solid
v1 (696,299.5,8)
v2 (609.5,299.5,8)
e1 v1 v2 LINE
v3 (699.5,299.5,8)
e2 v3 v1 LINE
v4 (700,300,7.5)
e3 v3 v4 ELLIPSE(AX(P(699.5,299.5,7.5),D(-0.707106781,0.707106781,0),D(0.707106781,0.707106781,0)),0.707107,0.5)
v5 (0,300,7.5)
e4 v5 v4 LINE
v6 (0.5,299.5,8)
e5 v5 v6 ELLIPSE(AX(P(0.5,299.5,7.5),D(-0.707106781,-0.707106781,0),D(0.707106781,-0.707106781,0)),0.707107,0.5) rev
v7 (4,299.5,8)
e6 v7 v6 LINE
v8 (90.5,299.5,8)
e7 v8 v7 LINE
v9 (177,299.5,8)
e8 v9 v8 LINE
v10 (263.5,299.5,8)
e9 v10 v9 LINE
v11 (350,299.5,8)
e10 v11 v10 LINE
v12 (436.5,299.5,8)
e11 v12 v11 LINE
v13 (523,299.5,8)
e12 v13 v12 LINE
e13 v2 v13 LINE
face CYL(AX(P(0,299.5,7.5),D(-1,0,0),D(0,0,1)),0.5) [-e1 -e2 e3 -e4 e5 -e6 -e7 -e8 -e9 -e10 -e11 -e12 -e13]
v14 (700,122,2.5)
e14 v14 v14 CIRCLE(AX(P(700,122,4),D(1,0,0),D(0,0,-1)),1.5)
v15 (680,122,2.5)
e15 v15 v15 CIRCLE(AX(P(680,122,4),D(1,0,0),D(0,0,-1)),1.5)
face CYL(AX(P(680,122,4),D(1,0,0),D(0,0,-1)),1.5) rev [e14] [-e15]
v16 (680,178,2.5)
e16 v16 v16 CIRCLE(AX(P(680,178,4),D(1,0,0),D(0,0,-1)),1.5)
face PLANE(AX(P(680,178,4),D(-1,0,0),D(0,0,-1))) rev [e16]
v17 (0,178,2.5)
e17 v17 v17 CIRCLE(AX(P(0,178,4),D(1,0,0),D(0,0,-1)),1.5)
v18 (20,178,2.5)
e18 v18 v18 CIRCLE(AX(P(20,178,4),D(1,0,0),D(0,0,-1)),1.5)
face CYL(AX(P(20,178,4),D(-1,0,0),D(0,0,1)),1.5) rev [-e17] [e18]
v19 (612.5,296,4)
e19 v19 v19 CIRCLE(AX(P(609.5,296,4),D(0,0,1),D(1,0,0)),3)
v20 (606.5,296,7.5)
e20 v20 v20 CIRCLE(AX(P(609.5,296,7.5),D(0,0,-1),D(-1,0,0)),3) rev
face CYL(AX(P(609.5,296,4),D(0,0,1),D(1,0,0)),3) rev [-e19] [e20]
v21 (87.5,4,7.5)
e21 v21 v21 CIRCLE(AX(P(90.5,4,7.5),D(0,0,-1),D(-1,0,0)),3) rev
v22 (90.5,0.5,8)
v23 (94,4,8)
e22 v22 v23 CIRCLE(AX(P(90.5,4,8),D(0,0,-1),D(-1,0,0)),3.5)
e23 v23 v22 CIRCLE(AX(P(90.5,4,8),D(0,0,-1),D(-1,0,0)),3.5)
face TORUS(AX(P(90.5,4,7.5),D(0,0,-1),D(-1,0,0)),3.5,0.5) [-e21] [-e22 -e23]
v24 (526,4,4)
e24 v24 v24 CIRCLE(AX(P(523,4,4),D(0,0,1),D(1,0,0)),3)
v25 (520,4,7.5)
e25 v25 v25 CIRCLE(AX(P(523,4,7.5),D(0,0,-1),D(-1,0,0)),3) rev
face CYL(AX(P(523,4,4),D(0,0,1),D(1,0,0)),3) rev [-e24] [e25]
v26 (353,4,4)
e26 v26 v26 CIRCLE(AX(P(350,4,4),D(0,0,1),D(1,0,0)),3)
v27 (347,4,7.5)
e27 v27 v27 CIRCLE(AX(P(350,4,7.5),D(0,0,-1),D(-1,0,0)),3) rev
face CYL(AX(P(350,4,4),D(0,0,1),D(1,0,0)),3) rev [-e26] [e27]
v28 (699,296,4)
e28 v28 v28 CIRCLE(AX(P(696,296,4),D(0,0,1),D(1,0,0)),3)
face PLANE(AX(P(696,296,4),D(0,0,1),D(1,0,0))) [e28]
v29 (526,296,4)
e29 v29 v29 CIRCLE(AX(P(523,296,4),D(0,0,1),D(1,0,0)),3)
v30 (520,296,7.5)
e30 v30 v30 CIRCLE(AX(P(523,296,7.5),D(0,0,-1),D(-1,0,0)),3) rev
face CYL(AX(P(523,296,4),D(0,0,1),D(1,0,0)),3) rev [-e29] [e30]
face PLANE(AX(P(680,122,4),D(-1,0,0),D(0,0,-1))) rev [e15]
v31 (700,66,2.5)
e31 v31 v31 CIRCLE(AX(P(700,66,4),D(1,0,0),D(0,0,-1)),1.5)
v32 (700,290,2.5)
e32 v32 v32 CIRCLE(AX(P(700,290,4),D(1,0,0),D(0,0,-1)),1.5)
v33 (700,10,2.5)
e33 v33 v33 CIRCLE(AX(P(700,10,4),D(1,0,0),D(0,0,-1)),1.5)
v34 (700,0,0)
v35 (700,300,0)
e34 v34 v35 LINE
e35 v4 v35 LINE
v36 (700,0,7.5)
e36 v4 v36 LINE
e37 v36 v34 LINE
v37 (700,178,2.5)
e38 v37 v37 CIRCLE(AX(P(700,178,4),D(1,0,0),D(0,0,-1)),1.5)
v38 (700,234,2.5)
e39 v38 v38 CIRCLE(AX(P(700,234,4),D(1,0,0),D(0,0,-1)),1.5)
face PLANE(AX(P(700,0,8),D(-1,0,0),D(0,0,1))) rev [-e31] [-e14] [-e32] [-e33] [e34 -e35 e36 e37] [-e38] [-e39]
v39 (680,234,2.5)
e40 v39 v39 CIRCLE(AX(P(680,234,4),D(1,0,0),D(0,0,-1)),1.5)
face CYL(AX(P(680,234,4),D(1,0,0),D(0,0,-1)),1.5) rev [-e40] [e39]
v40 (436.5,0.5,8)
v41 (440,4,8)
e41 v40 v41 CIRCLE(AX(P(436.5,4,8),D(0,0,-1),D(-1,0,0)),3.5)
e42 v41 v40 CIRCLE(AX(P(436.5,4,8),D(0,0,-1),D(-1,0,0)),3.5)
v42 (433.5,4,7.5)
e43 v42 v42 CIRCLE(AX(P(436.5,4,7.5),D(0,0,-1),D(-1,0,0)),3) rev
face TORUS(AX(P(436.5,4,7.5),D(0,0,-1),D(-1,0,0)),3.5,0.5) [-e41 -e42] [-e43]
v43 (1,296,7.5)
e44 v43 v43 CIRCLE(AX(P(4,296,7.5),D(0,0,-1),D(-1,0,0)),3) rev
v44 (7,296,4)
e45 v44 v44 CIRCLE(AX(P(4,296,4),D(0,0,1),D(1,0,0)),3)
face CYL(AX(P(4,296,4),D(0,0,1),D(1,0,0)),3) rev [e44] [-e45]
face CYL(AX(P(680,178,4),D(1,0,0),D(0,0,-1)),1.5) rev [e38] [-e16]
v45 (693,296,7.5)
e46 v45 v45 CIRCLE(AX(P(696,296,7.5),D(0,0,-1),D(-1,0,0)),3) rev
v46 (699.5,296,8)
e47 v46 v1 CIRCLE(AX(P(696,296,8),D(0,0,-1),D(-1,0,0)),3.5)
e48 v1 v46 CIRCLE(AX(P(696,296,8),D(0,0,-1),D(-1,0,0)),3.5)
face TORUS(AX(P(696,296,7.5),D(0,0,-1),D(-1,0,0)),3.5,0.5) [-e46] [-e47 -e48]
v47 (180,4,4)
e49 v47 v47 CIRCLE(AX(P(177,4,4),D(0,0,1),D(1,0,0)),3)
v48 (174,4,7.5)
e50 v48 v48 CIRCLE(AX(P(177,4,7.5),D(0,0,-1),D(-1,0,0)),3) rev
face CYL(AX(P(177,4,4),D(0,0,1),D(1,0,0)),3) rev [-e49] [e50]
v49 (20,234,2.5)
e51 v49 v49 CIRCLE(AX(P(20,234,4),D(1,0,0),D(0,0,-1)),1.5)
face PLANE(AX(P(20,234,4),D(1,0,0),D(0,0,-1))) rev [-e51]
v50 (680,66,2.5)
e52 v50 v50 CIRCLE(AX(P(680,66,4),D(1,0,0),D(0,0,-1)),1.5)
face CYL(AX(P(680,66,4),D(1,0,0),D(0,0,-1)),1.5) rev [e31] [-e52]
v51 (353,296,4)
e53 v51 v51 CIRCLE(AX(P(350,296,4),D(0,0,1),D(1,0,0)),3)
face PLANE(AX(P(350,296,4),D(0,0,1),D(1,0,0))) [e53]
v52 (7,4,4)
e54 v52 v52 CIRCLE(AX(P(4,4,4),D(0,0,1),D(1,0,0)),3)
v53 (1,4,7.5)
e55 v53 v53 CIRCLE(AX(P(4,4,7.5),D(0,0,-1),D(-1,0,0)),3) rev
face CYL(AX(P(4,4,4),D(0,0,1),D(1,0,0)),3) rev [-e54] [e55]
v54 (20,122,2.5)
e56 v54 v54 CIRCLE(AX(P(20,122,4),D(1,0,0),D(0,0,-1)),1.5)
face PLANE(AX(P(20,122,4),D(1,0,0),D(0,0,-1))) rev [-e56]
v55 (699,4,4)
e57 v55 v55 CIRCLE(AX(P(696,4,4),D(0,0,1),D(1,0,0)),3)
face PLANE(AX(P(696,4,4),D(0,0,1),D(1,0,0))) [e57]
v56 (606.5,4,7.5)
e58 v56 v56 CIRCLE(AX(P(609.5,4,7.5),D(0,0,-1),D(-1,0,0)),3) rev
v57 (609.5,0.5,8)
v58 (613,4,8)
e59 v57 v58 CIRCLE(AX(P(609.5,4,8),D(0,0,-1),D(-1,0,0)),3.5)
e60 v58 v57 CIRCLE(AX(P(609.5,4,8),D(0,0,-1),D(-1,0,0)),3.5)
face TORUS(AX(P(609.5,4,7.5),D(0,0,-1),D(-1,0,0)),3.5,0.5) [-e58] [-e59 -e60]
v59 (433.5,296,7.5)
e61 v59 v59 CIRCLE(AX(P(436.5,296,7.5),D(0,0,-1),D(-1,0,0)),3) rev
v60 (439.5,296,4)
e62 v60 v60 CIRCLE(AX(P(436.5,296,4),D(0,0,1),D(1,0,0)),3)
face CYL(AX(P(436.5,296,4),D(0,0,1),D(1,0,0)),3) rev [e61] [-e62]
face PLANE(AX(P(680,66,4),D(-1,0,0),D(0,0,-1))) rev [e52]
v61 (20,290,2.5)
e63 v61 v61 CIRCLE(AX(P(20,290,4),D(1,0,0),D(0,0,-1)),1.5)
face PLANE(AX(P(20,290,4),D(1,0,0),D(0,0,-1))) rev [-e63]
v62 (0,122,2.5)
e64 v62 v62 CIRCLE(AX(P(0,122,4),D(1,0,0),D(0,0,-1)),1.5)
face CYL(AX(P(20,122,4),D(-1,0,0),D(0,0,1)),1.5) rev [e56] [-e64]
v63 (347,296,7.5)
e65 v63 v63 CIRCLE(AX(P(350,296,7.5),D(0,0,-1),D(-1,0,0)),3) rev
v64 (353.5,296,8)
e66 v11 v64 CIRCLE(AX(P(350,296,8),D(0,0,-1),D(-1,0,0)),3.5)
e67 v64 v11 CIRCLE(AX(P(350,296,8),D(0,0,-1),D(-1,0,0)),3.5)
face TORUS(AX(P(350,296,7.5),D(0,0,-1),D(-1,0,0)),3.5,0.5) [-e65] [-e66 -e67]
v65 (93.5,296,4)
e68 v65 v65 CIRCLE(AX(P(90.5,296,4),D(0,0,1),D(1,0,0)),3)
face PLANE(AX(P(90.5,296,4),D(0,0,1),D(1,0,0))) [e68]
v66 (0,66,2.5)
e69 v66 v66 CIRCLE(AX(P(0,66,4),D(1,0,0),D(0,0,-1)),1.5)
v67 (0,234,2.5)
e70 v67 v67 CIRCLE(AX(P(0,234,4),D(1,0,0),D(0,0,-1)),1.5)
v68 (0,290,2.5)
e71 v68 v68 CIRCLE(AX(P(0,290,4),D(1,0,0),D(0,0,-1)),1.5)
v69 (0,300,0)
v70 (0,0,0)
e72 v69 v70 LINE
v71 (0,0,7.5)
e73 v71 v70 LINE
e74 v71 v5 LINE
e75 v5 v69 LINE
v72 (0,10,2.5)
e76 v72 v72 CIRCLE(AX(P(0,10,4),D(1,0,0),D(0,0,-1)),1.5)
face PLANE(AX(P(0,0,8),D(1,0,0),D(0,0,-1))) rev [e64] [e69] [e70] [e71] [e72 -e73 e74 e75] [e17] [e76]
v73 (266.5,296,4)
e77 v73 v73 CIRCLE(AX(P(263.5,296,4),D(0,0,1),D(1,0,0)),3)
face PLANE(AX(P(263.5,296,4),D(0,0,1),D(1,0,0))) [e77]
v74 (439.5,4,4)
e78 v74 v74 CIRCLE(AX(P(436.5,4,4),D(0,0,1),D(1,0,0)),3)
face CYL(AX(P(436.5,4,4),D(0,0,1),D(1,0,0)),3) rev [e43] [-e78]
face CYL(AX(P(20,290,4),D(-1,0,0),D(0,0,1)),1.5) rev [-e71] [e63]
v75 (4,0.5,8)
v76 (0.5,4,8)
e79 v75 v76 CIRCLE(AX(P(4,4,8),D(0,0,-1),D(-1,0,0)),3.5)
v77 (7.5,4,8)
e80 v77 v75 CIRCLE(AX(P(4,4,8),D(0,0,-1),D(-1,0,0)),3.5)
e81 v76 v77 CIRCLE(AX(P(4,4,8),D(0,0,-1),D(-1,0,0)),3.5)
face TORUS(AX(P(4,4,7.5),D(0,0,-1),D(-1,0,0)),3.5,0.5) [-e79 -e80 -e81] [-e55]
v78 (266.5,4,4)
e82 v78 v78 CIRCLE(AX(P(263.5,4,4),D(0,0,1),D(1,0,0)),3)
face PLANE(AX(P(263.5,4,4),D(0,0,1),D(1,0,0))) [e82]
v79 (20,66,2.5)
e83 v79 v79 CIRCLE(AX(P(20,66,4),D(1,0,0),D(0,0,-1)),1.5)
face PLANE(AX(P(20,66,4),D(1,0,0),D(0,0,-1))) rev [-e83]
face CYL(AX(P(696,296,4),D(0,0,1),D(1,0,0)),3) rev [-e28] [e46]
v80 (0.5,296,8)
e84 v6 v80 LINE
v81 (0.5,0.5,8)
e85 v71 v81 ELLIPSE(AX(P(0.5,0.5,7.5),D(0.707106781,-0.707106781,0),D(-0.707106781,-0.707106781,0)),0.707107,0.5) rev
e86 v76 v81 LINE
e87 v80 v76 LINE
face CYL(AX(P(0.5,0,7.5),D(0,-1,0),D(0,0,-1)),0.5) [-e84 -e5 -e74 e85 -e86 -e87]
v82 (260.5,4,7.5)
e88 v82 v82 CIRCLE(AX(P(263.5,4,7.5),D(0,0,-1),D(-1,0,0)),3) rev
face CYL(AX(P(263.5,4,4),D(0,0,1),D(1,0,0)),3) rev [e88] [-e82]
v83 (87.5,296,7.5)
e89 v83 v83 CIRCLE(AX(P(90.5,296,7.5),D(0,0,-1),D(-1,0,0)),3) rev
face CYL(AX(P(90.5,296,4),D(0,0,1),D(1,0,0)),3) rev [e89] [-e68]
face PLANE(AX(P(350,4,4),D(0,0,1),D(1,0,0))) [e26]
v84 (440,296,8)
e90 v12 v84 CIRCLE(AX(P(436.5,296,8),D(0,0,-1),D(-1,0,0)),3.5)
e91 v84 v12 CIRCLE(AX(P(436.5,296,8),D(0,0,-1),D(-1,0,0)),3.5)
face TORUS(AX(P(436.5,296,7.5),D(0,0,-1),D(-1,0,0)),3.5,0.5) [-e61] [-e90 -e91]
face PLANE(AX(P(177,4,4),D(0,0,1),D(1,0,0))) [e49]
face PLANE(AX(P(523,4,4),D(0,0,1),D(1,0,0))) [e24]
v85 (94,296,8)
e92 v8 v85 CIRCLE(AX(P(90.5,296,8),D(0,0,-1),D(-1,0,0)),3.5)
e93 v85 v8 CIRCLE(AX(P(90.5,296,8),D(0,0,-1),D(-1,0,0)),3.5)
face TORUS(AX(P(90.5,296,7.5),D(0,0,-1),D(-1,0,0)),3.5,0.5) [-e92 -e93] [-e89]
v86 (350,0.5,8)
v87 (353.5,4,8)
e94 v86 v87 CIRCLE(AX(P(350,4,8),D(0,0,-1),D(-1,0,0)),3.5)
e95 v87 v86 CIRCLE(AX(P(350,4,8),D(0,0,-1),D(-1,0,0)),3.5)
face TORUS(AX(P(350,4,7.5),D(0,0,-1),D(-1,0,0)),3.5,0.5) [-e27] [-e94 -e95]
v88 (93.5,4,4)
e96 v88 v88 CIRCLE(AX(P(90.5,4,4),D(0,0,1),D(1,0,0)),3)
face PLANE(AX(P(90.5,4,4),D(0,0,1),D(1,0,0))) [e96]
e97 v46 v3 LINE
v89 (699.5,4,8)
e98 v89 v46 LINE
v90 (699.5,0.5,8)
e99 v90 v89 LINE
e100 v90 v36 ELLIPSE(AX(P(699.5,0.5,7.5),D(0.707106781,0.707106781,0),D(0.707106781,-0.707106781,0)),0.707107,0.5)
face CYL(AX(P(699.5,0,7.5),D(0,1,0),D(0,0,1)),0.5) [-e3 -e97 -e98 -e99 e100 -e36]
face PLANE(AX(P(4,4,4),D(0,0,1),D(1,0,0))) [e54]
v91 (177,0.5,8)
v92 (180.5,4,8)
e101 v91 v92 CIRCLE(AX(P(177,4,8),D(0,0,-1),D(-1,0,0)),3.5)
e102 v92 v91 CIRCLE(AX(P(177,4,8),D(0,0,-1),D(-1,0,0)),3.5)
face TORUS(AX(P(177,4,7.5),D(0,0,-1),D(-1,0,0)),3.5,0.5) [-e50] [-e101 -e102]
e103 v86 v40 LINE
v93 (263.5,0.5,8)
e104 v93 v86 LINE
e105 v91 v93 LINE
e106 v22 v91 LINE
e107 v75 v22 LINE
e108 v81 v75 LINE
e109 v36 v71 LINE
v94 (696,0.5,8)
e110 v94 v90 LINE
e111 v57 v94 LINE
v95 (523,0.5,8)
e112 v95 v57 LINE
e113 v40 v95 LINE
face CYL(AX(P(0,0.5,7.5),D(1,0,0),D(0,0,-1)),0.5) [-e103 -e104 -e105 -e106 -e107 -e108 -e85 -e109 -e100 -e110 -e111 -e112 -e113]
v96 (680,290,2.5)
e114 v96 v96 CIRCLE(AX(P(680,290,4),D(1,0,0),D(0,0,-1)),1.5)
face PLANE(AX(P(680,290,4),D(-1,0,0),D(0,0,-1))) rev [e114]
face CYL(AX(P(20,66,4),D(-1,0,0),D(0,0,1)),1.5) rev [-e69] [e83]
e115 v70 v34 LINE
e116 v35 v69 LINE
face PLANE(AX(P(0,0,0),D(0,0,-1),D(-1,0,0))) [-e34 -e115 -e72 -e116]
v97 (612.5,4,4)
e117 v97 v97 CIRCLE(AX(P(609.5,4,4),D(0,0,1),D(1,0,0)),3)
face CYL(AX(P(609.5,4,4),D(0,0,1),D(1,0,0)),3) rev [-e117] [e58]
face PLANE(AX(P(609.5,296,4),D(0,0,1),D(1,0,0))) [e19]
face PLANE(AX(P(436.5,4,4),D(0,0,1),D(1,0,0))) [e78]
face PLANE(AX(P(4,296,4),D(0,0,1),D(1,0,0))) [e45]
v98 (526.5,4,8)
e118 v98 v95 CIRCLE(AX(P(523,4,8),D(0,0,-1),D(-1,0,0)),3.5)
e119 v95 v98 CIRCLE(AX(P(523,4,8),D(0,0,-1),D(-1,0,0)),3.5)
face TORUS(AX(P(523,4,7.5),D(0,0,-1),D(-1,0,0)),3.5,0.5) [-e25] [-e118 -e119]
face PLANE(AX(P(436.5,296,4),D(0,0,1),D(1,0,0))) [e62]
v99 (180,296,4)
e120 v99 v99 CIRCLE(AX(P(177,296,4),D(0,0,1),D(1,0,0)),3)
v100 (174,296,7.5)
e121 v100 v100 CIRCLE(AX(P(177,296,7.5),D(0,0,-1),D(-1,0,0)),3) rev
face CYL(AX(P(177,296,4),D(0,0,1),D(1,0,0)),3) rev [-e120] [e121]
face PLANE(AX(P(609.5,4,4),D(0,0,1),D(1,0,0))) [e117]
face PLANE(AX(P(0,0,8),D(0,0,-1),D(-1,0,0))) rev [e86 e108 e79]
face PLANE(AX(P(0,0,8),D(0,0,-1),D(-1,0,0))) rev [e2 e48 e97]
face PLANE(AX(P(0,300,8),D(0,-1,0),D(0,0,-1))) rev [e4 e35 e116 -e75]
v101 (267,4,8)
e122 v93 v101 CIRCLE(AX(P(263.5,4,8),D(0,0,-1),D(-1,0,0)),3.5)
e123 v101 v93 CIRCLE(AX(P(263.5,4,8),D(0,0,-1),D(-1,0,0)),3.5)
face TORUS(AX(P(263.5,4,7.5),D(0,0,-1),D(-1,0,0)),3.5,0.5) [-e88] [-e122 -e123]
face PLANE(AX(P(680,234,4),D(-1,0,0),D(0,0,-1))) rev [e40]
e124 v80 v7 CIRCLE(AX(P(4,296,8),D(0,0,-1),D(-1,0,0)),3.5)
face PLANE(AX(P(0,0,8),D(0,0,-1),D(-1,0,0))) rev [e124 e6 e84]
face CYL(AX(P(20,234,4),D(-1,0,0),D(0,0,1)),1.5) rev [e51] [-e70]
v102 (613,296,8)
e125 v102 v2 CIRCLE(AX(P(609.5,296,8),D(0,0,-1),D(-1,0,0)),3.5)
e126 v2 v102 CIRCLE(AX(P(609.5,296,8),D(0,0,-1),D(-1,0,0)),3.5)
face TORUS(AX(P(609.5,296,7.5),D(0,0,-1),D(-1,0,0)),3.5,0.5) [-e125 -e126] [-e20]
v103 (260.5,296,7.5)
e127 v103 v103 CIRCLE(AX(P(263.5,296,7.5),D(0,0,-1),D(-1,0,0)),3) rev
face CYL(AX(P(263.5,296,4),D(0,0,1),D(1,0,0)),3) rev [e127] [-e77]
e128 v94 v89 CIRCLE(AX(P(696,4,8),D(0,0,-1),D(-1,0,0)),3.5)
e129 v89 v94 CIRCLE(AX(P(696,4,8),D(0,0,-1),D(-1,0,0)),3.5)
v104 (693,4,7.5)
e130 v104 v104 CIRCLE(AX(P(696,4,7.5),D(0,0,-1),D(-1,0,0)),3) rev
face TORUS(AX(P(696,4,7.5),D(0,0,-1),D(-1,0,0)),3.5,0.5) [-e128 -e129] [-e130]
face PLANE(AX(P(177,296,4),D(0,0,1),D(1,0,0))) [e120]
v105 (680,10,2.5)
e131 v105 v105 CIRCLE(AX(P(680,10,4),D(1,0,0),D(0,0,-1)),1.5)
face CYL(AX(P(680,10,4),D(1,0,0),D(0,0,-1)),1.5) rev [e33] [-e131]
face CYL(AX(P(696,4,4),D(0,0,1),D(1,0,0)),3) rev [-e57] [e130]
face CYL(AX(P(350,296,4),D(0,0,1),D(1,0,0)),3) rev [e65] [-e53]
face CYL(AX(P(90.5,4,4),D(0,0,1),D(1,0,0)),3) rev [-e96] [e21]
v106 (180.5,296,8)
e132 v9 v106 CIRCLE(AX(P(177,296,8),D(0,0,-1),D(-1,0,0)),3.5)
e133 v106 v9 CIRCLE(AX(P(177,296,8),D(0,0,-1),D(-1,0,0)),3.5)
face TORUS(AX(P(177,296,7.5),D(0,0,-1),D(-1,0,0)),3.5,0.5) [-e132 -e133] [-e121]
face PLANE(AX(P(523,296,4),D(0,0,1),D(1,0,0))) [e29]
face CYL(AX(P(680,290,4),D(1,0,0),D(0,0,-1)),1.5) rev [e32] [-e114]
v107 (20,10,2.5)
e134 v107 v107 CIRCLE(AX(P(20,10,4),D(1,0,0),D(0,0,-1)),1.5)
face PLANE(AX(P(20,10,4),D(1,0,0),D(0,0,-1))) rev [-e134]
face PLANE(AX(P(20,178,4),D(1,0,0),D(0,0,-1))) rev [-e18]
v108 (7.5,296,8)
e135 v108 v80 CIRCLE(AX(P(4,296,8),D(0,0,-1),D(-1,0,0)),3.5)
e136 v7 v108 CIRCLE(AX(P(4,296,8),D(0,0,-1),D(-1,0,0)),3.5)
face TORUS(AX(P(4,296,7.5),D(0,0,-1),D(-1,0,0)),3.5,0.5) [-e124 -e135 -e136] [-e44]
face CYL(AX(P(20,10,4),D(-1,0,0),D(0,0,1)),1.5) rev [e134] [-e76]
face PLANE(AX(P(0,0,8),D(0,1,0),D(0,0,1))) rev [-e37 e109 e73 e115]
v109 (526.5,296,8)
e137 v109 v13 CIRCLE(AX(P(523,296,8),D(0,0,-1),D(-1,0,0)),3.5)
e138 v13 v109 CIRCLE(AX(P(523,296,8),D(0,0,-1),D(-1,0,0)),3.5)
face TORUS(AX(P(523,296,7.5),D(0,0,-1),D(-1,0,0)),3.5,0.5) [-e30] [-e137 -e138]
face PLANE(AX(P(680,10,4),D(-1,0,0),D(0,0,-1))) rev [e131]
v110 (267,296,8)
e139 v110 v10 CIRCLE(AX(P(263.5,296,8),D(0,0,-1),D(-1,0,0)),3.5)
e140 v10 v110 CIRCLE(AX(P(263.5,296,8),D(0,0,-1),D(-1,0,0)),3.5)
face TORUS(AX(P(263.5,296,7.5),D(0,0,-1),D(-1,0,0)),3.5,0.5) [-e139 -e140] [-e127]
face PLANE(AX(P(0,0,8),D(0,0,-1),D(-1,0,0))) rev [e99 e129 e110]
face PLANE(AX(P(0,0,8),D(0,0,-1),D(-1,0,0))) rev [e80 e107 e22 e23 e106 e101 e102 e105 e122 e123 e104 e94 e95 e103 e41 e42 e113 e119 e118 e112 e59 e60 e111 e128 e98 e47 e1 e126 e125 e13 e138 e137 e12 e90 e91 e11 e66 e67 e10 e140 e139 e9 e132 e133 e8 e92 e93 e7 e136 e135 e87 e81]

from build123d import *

# Parameters (mm, degrees)
SKETCH1_W               = 700
SKETCH1_H               = 300
BOSS_EXTRUDE1_DEPTH     = 8
SKETCH4_R               = 3
CUT_EXTRUDE2_DEPTH      = 4
LPATTERN1_COUNT         = 9
LPATTERN1_PITCH         = 86.5
LPATTERN1_COUNT_DIR2    = 2
LPATTERN1_PITCH_DIR2    = 292
SKETCH7_R               = 1.5
CUT_EXTRUDE7_DEPTH      = 20
FILLET1_R               = 0.5
LPATTERN2_COUNT         = 6
LPATTERN2_PITCH         = 56
MIRROR1_COPY_1_SKETCH_R = 1.5
MIRROR1_COPY_1_DEPTH    = 20
MIRROR1_COPY_2_SKETCH_R = 1.5
MIRROR1_COPY_2_DEPTH    = 20
MIRROR1_COPY_3_SKETCH_R = 1.5
MIRROR1_COPY_3_DEPTH    = 20
MIRROR1_COPY_4_SKETCH_R = 1.5
MIRROR1_COPY_4_DEPTH    = 20
MIRROR1_COPY_5_SKETCH_R = 1.5
MIRROR1_COPY_5_DEPTH    = 20


with BuildPart() as part:
    # Sketch1 → Boss-Extrude1 (new body)
    with BuildSketch(Plane.XY):
        with Locations((350, 150)):
            Rectangle(SKETCH1_W, SKETCH1_H)
    extrude(amount=BOSS_EXTRUDE1_DEPTH)

    # Sketch4 → Cut-Extrude2 (cut)
    with BuildSketch(Plane.XY.offset(8)):
        with Locations((4, 296)):
            Circle(SKETCH4_R)
    cut_extrude2 = extrude(amount=-CUT_EXTRUDE2_DEPTH, mode=Mode.SUBTRACT)

    # LPattern1: Cut-Extrude2 9 × 2
    with Locations(*[(i * LPATTERN1_PITCH, -j * LPATTERN1_PITCH_DIR2, 0) for i in range(LPATTERN1_COUNT) for j in range(LPATTERN1_COUNT_DIR2) if (i, j) != (0, 0)]):
        add(cut_extrude2, mode=Mode.SUBTRACT)

    # Sketch7 → Cut-Extrude7 (cut)
    with BuildSketch(Plane(origin=(0, 0, 4), x_dir=(0, 0, -1), z_dir=(1, 0, 0))):
        with Locations((0, 290)):
            Circle(SKETCH7_R)
    cut_extrude7 = extrude(amount=CUT_EXTRUDE7_DEPTH, mode=Mode.SUBTRACT)

    # Fillet1
    fillet1_edges = [part.edges().sort_by_distance(p)[0] for p in [
        (700, 150, 8),
        (350, 300, 8),
        (1, 296, 8),
        (87.5, 296, 8),
        (174, 296, 8),
        (260.5, 296, 8),
        (347, 296, 8),
        (433.5, 296, 8),
        (520, 296, 8),
        (606.5, 296, 8),
        (693, 296, 8),
        (1, 4, 8),
        (87.5, 4, 8),
        (174, 4, 8),
        (0, 150, 8),
        (260.5, 4, 8),
        (347, 4, 8),
        (433.5, 4, 8),
        (520, 4, 8),
        (606.5, 4, 8),
        (693, 4, 8),
        (350, 0, 8),
    ]]
    fillet(fillet1_edges, radius=FILLET1_R - 0.0001)  # a hair under: the kernel refuses the full size

    # LPattern2: Cut-Extrude7 ×6
    with Locations(*[(0, -i * LPATTERN2_PITCH, 0) for i in range(1, LPATTERN2_COUNT)]):
        add(cut_extrude7, mode=Mode.SUBTRACT)

    # Mirror1: Cut-Extrude7 across plane
    add(cut_extrude7.mirror(Plane(origin=(350, 0, 0), x_dir=(0, 0, 1), z_dir=(1, 0, 0))), mode=Mode.SUBTRACT)

    # Mirror1 copy 1 sketch → Mirror1 copy 1 (cut)
    with BuildSketch(Plane(origin=(700, -56, 4), x_dir=(0, 0, -1), z_dir=(-1, 0, 0))):
        with Locations((0, -290)):
            Circle(MIRROR1_COPY_1_SKETCH_R)
    extrude(amount=MIRROR1_COPY_1_DEPTH, mode=Mode.SUBTRACT)

    # Mirror1 copy 2 sketch → Mirror1 copy 2 (cut)
    with BuildSketch(Plane(origin=(700, -112, 4), x_dir=(0, 0, -1), z_dir=(-1, 0, 0))):
        with Locations((0, -290)):
            Circle(MIRROR1_COPY_2_SKETCH_R)
    extrude(amount=MIRROR1_COPY_2_DEPTH, mode=Mode.SUBTRACT)

    # Mirror1 copy 3 sketch → Mirror1 copy 3 (cut)
    with BuildSketch(Plane(origin=(700, -168, 4), x_dir=(0, 0, -1), z_dir=(-1, 0, 0))):
        with Locations((0, -290)):
            Circle(MIRROR1_COPY_3_SKETCH_R)
    extrude(amount=MIRROR1_COPY_3_DEPTH, mode=Mode.SUBTRACT)

    # Mirror1 copy 4 sketch → Mirror1 copy 4 (cut)
    with BuildSketch(Plane(origin=(700, -224, 4), x_dir=(0, 0, -1), z_dir=(-1, 0, 0))):
        with Locations((0, -290)):
            Circle(MIRROR1_COPY_4_SKETCH_R)
    extrude(amount=MIRROR1_COPY_4_DEPTH, mode=Mode.SUBTRACT)

    # Mirror1 copy 5 sketch → Mirror1 copy 5 (cut)
    with BuildSketch(Plane(origin=(700, -280, 4), x_dir=(0, 0, -1), z_dir=(-1, 0, 0))):
        with Locations((0, -290)):
            Circle(MIRROR1_COPY_5_SKETCH_R)
    extrude(amount=MIRROR1_COPY_5_DEPTH, mode=Mode.SUBTRACT)


solid = part.part
